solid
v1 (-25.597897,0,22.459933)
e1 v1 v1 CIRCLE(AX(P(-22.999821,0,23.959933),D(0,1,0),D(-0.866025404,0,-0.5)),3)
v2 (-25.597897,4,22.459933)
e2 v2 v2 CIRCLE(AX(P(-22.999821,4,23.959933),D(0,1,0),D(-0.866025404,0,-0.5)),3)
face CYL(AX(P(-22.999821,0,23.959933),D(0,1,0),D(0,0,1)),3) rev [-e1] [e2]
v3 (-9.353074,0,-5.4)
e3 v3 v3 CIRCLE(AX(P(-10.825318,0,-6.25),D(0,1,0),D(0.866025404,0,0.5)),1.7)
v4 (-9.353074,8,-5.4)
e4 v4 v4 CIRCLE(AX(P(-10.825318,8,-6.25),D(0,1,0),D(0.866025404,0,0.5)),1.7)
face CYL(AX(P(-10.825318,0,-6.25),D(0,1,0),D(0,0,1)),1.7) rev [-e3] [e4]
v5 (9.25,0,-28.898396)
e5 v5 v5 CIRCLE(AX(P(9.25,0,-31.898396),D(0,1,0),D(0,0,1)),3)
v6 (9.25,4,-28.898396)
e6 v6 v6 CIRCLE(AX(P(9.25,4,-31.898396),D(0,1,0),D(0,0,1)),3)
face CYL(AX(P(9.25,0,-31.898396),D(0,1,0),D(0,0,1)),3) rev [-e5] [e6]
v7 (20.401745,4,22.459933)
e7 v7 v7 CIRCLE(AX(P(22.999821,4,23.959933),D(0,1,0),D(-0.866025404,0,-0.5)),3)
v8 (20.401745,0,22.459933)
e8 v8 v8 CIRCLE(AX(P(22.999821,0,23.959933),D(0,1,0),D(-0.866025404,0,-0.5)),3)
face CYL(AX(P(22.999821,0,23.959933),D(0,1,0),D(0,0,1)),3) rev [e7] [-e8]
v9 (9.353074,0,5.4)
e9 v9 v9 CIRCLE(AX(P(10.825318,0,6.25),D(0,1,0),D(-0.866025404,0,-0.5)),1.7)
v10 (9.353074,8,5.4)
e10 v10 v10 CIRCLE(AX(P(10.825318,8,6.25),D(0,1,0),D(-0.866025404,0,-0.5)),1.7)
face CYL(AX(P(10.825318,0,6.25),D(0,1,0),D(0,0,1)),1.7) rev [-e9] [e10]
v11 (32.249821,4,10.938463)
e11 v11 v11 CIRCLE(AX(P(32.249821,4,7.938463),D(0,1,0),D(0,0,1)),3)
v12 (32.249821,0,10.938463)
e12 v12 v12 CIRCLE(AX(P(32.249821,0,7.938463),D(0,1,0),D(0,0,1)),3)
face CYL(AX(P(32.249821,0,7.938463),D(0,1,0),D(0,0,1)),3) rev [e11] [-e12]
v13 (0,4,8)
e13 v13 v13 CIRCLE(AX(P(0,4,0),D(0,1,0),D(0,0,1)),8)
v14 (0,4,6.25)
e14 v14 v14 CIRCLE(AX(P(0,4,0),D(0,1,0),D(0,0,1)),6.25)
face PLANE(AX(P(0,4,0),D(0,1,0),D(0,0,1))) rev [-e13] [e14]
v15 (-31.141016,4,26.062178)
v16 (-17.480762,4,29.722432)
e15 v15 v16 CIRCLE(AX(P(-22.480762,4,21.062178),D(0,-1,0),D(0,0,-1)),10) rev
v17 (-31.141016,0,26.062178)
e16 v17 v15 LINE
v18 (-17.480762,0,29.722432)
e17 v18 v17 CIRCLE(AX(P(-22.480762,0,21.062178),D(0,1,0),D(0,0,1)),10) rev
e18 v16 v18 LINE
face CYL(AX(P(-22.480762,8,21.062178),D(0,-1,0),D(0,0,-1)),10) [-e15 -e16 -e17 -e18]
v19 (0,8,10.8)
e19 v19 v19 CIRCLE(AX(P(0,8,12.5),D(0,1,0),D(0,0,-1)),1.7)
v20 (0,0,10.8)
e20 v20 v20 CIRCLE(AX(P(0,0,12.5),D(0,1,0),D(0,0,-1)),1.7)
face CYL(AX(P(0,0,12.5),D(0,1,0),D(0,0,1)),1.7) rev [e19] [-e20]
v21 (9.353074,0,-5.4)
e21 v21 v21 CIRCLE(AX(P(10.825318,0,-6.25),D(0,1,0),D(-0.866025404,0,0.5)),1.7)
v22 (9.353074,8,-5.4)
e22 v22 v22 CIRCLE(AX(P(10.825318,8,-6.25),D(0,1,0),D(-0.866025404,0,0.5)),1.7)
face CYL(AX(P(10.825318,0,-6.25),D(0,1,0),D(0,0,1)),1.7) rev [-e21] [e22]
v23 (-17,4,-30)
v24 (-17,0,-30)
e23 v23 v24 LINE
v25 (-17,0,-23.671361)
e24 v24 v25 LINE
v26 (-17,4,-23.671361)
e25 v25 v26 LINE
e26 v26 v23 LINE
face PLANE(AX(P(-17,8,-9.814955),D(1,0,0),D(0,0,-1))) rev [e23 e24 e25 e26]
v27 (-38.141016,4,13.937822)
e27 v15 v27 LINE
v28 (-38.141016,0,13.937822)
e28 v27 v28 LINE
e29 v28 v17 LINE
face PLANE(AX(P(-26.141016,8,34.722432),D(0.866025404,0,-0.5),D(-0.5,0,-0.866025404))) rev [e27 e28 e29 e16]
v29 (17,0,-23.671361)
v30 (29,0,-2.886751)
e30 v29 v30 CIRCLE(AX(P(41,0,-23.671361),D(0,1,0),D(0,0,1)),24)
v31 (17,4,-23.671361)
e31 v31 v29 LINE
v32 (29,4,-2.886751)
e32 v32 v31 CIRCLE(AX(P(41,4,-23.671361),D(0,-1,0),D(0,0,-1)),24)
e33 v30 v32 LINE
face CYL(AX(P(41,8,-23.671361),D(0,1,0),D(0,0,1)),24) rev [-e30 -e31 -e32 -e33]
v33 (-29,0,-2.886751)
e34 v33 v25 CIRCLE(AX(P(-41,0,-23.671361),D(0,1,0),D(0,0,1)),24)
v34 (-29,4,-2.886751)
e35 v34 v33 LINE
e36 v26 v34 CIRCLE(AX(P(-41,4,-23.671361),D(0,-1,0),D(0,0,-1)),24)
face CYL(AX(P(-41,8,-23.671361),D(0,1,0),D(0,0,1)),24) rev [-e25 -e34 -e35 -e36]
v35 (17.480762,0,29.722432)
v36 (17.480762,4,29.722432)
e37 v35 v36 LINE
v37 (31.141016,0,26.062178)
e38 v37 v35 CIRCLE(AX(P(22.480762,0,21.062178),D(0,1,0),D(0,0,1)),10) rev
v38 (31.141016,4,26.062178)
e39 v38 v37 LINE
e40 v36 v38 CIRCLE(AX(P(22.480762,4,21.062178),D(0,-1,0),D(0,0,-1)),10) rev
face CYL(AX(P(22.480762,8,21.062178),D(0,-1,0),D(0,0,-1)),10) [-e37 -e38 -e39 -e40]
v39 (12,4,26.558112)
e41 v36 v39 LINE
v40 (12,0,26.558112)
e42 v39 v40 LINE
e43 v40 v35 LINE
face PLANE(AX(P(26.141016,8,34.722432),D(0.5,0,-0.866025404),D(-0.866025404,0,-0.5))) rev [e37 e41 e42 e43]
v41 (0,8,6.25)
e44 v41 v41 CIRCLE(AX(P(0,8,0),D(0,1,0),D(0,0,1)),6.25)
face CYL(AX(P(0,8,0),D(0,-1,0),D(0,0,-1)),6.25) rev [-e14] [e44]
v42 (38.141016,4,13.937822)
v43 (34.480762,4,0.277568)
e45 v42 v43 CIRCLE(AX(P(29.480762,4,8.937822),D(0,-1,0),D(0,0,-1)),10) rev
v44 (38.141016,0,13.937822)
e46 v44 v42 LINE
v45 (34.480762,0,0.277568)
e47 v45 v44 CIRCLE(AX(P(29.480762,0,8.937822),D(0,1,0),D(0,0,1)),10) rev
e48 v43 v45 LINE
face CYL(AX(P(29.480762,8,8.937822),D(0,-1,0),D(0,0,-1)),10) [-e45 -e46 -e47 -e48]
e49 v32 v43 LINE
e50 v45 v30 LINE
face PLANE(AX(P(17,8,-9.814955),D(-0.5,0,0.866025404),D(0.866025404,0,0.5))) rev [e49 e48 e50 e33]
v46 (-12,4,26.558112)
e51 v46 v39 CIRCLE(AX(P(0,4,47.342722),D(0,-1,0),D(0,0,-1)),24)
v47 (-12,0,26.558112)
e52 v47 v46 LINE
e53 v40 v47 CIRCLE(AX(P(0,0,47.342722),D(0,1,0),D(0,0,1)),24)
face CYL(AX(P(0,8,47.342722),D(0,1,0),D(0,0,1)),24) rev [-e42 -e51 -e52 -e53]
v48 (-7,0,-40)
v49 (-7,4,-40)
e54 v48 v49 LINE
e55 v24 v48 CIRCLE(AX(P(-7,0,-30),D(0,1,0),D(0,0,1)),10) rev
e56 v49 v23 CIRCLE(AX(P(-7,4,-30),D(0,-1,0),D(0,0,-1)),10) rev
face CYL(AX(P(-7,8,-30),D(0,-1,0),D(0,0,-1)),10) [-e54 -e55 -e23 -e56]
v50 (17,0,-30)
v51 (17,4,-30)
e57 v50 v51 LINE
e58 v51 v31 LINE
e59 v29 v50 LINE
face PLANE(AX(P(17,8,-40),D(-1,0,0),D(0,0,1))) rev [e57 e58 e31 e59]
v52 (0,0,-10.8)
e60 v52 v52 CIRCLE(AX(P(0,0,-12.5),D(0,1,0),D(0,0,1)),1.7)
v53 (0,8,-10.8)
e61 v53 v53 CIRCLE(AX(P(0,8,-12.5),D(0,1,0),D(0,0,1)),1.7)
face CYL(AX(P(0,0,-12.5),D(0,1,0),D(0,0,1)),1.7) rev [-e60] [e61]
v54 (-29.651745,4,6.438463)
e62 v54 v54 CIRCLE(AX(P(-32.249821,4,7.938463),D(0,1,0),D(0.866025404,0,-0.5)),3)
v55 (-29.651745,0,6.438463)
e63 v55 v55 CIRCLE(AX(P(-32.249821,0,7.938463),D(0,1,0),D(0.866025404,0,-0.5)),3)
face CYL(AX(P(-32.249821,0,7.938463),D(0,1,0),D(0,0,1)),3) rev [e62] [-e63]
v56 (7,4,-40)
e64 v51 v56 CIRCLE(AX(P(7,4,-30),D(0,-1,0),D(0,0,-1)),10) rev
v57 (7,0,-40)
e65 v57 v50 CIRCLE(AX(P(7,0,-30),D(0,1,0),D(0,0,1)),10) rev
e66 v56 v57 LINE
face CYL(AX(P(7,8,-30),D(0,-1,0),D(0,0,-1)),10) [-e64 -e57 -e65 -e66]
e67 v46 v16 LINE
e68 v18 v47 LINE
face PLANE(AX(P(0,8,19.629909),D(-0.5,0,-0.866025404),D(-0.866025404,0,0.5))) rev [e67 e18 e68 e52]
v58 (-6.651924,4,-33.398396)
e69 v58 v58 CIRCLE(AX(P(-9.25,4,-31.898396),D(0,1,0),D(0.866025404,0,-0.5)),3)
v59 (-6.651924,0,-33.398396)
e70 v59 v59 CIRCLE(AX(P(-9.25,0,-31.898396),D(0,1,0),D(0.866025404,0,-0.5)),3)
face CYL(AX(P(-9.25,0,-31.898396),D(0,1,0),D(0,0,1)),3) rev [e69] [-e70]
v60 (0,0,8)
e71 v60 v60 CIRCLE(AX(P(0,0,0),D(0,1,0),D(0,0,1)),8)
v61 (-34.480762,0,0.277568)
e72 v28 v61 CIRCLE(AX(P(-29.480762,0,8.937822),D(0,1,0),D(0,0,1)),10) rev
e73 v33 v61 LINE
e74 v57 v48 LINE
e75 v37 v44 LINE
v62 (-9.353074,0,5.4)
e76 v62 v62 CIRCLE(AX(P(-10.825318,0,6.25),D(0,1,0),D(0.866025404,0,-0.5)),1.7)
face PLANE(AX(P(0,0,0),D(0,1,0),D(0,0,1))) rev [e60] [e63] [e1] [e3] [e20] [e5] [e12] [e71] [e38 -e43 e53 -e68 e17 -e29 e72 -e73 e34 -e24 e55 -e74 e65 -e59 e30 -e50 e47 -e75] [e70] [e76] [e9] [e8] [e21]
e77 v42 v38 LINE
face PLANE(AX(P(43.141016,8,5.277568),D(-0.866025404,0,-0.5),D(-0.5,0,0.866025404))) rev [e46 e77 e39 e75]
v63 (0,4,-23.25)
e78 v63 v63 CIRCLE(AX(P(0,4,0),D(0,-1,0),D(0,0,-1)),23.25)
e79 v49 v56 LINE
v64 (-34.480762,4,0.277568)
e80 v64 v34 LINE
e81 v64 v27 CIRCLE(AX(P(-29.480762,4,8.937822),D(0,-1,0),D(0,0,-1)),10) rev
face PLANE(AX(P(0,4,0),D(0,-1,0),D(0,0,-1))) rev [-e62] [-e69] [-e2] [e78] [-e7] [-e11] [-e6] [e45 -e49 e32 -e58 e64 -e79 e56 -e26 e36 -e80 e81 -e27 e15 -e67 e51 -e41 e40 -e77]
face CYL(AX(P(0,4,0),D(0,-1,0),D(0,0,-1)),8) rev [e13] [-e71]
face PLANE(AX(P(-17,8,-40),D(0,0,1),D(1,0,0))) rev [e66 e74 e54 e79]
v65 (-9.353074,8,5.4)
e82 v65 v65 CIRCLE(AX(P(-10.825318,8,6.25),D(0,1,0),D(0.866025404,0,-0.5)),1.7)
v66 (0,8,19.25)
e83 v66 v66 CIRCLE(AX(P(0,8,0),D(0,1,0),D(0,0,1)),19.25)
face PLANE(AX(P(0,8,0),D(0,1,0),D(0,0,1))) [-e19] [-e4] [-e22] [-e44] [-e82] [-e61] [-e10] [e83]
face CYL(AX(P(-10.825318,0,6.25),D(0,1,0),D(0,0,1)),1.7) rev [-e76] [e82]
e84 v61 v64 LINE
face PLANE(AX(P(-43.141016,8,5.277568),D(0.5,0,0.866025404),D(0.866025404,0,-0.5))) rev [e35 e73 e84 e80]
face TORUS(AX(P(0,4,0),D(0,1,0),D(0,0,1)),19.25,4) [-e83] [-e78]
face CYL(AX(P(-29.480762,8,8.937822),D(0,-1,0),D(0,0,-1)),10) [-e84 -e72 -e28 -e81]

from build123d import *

# Parameters (mm, degrees)
SKETCH_1_R               = 6.25
EXTRUDE_627_DEPTH        = 8
SKETCH_2_R               = 8
CUT_EXTRUDE_911_DEPTH    = 4
SKETCH_3_R               = 1.7
CUT_EXTRUDE_3_DEPTH      = 60.372950698
PATTERN_CIRCULAR_1_COUNT = 6
SKETCH_4_R               = 47.5
SKETCH_4_R_2             = 23.25
CUT_EXTRUDE_3_2_DEPTH    = 4
FILLET_1_R               = 10
FILLET_2_R               = 24
FILLET_3_R               = 4
SKETCH_5_R               = 3
CUT_EXTRUDE_2981_DEPTH   = 57.344747555
PATTERN_CIRCULAR_2_COUNT = 3


# Some blends are built 0.0001 mm under size
with BuildPart() as part:
    # Эскиз1 → Extrude 627 (new body)
    with BuildSketch(Plane(origin=(0, 0, 0), x_dir=(1, 0, 0), z_dir=(0, 1, 0))):
        Polygon((-17, 9.814954576), (-17, 40), (17, 40), (17, 9.814954576), (43.141016151, -5.277568136), (26.141016151, -34.722431864), (0, -19.629909152), (-26.141016151, -34.722431864), (-43.141016151, -5.277568136), align=None)
        with Locations(Location((0, 0, 0), (0, 0, 270))):
            Circle(SKETCH_1_R, mode=Mode.SUBTRACT)
    extrude(amount=EXTRUDE_627_DEPTH)

    # Эскиз2 → Cut-Extrude 911 (cut)
    with BuildSketch(Plane(origin=(0, 0, 0), x_dir=(1, 0, 0), z_dir=(0, 1, 0))):
        with Locations(Location((0, 0, 0), (0, 0, 270))):
            Circle(SKETCH_2_R)
    extrude(amount=CUT_EXTRUDE_911_DEPTH, mode=Mode.SUBTRACT)

    # Эскиз3 → Cut-Extrude 3 (cut, through all)
    with BuildSketch(Plane(origin=(0, 8, 0), x_dir=(1, 0, 0), z_dir=(0, 1, 0))):
        with Locations(Location((0, 12.5, 0), (0, 0, 270))):
            Circle(SKETCH_3_R)
    cut_extrude_3 = extrude(amount=-CUT_EXTRUDE_3_DEPTH, mode=Mode.SUBTRACT)

    # Круговой массив1: Cut-Extrude 3 ×6 about axis
    pattern_circular_1_axis = Axis((0, 0, 0), (0, 1, 0))
    for i in range(1, PATTERN_CIRCULAR_1_COUNT):
        add(cut_extrude_3.rotate(pattern_circular_1_axis, i * 360 / PATTERN_CIRCULAR_1_COUNT), mode=Mode.SUBTRACT)

    # Эскиз4 → Cut-Extrude 3 2 (cut)
    with BuildSketch(Plane.XZ.offset(-8)):
        Circle(SKETCH_4_R)
        Circle(SKETCH_4_R_2, mode=Mode.SUBTRACT)
    extrude(amount=CUT_EXTRUDE_3_2_DEPTH, mode=Mode.SUBTRACT)

    # Скругление1
    fillet_1_edges = [part.edges().sort_by_distance(p)[0] for p in [
        (-17, 2, -40),
        (17, 2, -40),
        (43.141016151, 2, 5.277568136),
        (26.141016151, 2, 34.722431864),
        (-26.141016151, 2, 34.722431864),
        (-43.141016151, 2, 5.277568136),
    ]]
    fillet(fillet_1_edges, radius=FILLET_1_R)

    # Скругление2
    # the kernel refuses this fillet: 24 mm, written as the material it adds along each edge
    with BuildSketch(Plane(origin=(17, 0, -9.814954576), x_dir=(0, 0, -1), z_dir=(0, 1, 0))) as fillet_2_piece_1_section:
        with BuildLine():
            CenterArc((FILLET_2_R * 0.57735026919, -FILLET_2_R), FILLET_2_R, 90, 60)
            Line((-FILLET_2_R * 0.288675134595, -FILLET_2_R * 0.5), (0, 0))
            Line((0, 0), (FILLET_2_R * 0.57735026919, 0))
        make_face()
    fillet_2_piece_1 = extrude(amount=8, mode=Mode.PRIVATE)
    fillet_2_piece_1 = split(fillet_2_piece_1, bisect_by=Plane(origin=(20.179222724, 4, -11.650479672), z_dir=(0, -1, 0)), keep=Keep.TOP, mode=Mode.PRIVATE)
    fillet_2_piece_1 = fillet_2_piece_1 - Plane(origin=(0, 2, 0), x_dir=(1, 0, 0), z_dir=(0, 1, 0)) * Cylinder(23.25, 72, mode=Mode.PRIVATE)
    add(fillet_2_piece_1)
    with BuildSketch(Plane(origin=(17, 0, -9.814954576), x_dir=(0, 0, -1), z_dir=(0, 1, 0))) as fillet_2_piece_2_section:
        with BuildLine():
            CenterArc((FILLET_2_R * 0.57735026919, -FILLET_2_R), FILLET_2_R, 90, 60)
            Line((-FILLET_2_R * 0.288675134595, -FILLET_2_R * 0.5), (0, 0))
            Line((0, 0), (FILLET_2_R * 0.57735026919, 0))
        make_face()
    fillet_2_piece_2 = extrude(amount=8, mode=Mode.PRIVATE)
    fillet_2_piece_2 = split(fillet_2_piece_2, bisect_by=Plane(origin=(18.777250195, 4, -10.841050455), z_dir=(0, -1, 0)), keep=Keep.TOP, mode=Mode.PRIVATE)
    fillet_2_piece_2 = fillet_2_piece_2 & Plane(origin=(0, 2, 0), x_dir=(1, 0, 0), z_dir=(0, 1, 0)) * Cylinder(23.25, 72, mode=Mode.PRIVATE)
    add(fillet_2_piece_2)
    with BuildSketch(Plane(origin=(17, 0, -9.814954576), x_dir=(0, 0, -1), z_dir=(0, 1, 0))) as fillet_2_piece_3_section:
        with BuildLine():
            CenterArc((FILLET_2_R * 0.57735026919, -FILLET_2_R), FILLET_2_R, 90, 60)
            Line((-FILLET_2_R * 0.288675134595, -FILLET_2_R * 0.5), (0, 0))
            Line((0, 0), (FILLET_2_R * 0.57735026919, 0))
        make_face()
    fillet_2_piece_3 = extrude(amount=8, mode=Mode.PRIVATE)
    fillet_2_piece_3 = split(fillet_2_piece_3, bisect_by=Plane(origin=(18.777250195, 4, -10.841050455), z_dir=(0, 1, 0)), keep=Keep.TOP, mode=Mode.PRIVATE)
    fillet_2_piece_3 = fillet_2_piece_3 & Plane(origin=(0, 6, 0), x_dir=(1, 0, 0), z_dir=(0, 1, 0)) * Cylinder(23.25, 72, mode=Mode.PRIVATE)
    add(fillet_2_piece_3)
    with BuildSketch(Plane(origin=(-17, 0, -9.814954576), x_dir=(0, 0, -1), z_dir=(0, 1, 0))) as fillet_2_piece_4_section:
        with BuildLine():
            CenterArc((FILLET_2_R * 0.57735026919, FILLET_2_R), FILLET_2_R, 210, 60)
            Line((-FILLET_2_R * 0.288675134595, FILLET_2_R * 0.5), (0, 0))
            Line((0, 0), (FILLET_2_R * 0.57735026919, 0))
        make_face()
    fillet_2_piece_4 = extrude(amount=8, mode=Mode.PRIVATE)
    fillet_2_piece_4 = split(fillet_2_piece_4, bisect_by=Plane(origin=(-20.179222724, 4, -11.650479672), z_dir=(0, -1, 0)), keep=Keep.TOP, mode=Mode.PRIVATE)
    fillet_2_piece_4 = fillet_2_piece_4 - Plane(origin=(0, 2, 0), x_dir=(1, 0, 0), z_dir=(0, 1, 0)) * Cylinder(23.25, 72, mode=Mode.PRIVATE)
    add(fillet_2_piece_4)
    with BuildSketch(Plane(origin=(-17, 0, -9.814954576), x_dir=(0, 0, -1), z_dir=(0, 1, 0))) as fillet_2_piece_5_section:
        with BuildLine():
            CenterArc((FILLET_2_R * 0.57735026919, FILLET_2_R), FILLET_2_R, 210, 60)
            Line((-FILLET_2_R * 0.288675134595, FILLET_2_R * 0.5), (0, 0))
            Line((0, 0), (FILLET_2_R * 0.57735026919, 0))
        make_face()
    fillet_2_piece_5 = extrude(amount=8, mode=Mode.PRIVATE)
    fillet_2_piece_5 = split(fillet_2_piece_5, bisect_by=Plane(origin=(-18.777250195, 4, -10.841050455), z_dir=(0, -1, 0)), keep=Keep.TOP, mode=Mode.PRIVATE)
    fillet_2_piece_5 = fillet_2_piece_5 & Plane(origin=(0, 2, 0), x_dir=(1, 0, 0), z_dir=(0, 1, 0)) * Cylinder(23.25, 72, mode=Mode.PRIVATE)
    add(fillet_2_piece_5)
    with BuildSketch(Plane(origin=(-17, 0, -9.814954576), x_dir=(0, 0, -1), z_dir=(0, 1, 0))) as fillet_2_piece_6_section:
        with BuildLine():
            CenterArc((FILLET_2_R * 0.57735026919, FILLET_2_R), FILLET_2_R, 210, 60)
            Line((-FILLET_2_R * 0.288675134595, FILLET_2_R * 0.5), (0, 0))
            Line((0, 0), (FILLET_2_R * 0.57735026919, 0))
        make_face()
    fillet_2_piece_6 = extrude(amount=8, mode=Mode.PRIVATE)
    fillet_2_piece_6 = split(fillet_2_piece_6, bisect_by=Plane(origin=(-18.777250195, 4, -10.841050455), z_dir=(0, 1, 0)), keep=Keep.TOP, mode=Mode.PRIVATE)
    fillet_2_piece_6 = fillet_2_piece_6 & Plane(origin=(0, 6, 0), x_dir=(1, 0, 0), z_dir=(0, 1, 0)) * Cylinder(23.25, 72, mode=Mode.PRIVATE)
    add(fillet_2_piece_6)
    with BuildSketch(Plane(origin=(0, 0, 19.629909152), x_dir=(-0.8660254037844384, 0, 0.5000000000000003), z_dir=(0, 1, 0))) as fillet_2_piece_7_section:
        with BuildLine():
            CenterArc((FILLET_2_R * 0.57735026919, FILLET_2_R), FILLET_2_R, 210, 60)
            Line((-FILLET_2_R * 0.288675134595, FILLET_2_R * 0.5), (0, 0))
            Line((0, 0), (FILLET_2_R * 0.57735026919, 0))
        make_face()
    fillet_2_piece_7 = extrude(amount=8, mode=Mode.PRIVATE)
    fillet_2_piece_7 = split(fillet_2_piece_7, bisect_by=Plane(origin=(0, 4, 23.300959344), z_dir=(0, -1, 0)), keep=Keep.TOP, mode=Mode.PRIVATE)
    fillet_2_piece_7 = fillet_2_piece_7 - Plane(origin=(0, 2, 0), x_dir=(1, 0, 0), z_dir=(0, 1, 0)) * Cylinder(23.25, 72, mode=Mode.PRIVATE)
    add(fillet_2_piece_7)
    with BuildSketch(Plane(origin=(0, 0, 19.629909152), x_dir=(-0.8660254037844384, 0, 0.5000000000000003), z_dir=(0, 1, 0))) as fillet_2_piece_8_section:
        with BuildLine():
            CenterArc((FILLET_2_R * 0.57735026919, FILLET_2_R), FILLET_2_R, 210, 60)
            Line((-FILLET_2_R * 0.288675134595, FILLET_2_R * 0.5), (0, 0))
            Line((0, 0), (FILLET_2_R * 0.57735026919, 0))
        make_face()
    fillet_2_piece_8 = extrude(amount=8, mode=Mode.PRIVATE)
    fillet_2_piece_8 = split(fillet_2_piece_8, bisect_by=Plane(origin=(0, 4, 21.68210091), z_dir=(0, -1, 0)), keep=Keep.TOP, mode=Mode.PRIVATE)
    fillet_2_piece_8 = fillet_2_piece_8 & Plane(origin=(0, 2, 0), x_dir=(1, 0, 0), z_dir=(0, 1, 0)) * Cylinder(23.25, 72, mode=Mode.PRIVATE)
    add(fillet_2_piece_8)
    with BuildSketch(Plane(origin=(0, 0, 19.629909152), x_dir=(-0.8660254037844384, 0, 0.5000000000000003), z_dir=(0, 1, 0))) as fillet_2_piece_9_section:
        with BuildLine():
            CenterArc((FILLET_2_R * 0.57735026919, FILLET_2_R), FILLET_2_R, 210, 60)
            Line((-FILLET_2_R * 0.288675134595, FILLET_2_R * 0.5), (0, 0))
            Line((0, 0), (FILLET_2_R * 0.57735026919, 0))
        make_face()
    fillet_2_piece_9 = extrude(amount=8, mode=Mode.PRIVATE)
    fillet_2_piece_9 = split(fillet_2_piece_9, bisect_by=Plane(origin=(0, 4, 21.68210091), z_dir=(0, 1, 0)), keep=Keep.TOP, mode=Mode.PRIVATE)
    fillet_2_piece_9 = fillet_2_piece_9 & Plane(origin=(0, 6, 0), x_dir=(1, 0, 0), z_dir=(0, 1, 0)) * Cylinder(23.25, 72, mode=Mode.PRIVATE)
    add(fillet_2_piece_9)

    # Скругление3
    fillet_3_edges = [part.edges().sort_by_distance(p)[0] for p in [
        (-5.23578811, 8, -22.652792827),
    ]]
    fillet(fillet_3_edges, radius=FILLET_3_R - 0.0001)  # a hair under: the kernel refuses the full size

    # Эскиз5 → Cut-Extrude 2981 (cut, through all)
    with BuildSketch(Plane(origin=(0, 4, 0), x_dir=(-1, 0, 0), z_dir=(0, 1, 0))):
        with Locations(Location((-9.25, -31.898395826, 0), (0, 0, 90))):
            Circle(SKETCH_5_R)
        with Locations(Location((-32.249821125, 7.938462928, 0), (0, 0, 90))):
            Circle(SKETCH_5_R)
    cut_extrude_2981 = extrude(amount=-CUT_EXTRUDE_2981_DEPTH, mode=Mode.SUBTRACT)

    # Круговой массив2: Cut-Extrude 2981 ×3 about axis
    pattern_circular_2_axis = Axis((0, 0, 0), (0, 1, 0))
    for i in range(1, PATTERN_CIRCULAR_2_COUNT):
        add(cut_extrude_2981.rotate(pattern_circular_2_axis, i * 360 / PATTERN_CIRCULAR_2_COUNT), mode=Mode.SUBTRACT)


solid = part.part
